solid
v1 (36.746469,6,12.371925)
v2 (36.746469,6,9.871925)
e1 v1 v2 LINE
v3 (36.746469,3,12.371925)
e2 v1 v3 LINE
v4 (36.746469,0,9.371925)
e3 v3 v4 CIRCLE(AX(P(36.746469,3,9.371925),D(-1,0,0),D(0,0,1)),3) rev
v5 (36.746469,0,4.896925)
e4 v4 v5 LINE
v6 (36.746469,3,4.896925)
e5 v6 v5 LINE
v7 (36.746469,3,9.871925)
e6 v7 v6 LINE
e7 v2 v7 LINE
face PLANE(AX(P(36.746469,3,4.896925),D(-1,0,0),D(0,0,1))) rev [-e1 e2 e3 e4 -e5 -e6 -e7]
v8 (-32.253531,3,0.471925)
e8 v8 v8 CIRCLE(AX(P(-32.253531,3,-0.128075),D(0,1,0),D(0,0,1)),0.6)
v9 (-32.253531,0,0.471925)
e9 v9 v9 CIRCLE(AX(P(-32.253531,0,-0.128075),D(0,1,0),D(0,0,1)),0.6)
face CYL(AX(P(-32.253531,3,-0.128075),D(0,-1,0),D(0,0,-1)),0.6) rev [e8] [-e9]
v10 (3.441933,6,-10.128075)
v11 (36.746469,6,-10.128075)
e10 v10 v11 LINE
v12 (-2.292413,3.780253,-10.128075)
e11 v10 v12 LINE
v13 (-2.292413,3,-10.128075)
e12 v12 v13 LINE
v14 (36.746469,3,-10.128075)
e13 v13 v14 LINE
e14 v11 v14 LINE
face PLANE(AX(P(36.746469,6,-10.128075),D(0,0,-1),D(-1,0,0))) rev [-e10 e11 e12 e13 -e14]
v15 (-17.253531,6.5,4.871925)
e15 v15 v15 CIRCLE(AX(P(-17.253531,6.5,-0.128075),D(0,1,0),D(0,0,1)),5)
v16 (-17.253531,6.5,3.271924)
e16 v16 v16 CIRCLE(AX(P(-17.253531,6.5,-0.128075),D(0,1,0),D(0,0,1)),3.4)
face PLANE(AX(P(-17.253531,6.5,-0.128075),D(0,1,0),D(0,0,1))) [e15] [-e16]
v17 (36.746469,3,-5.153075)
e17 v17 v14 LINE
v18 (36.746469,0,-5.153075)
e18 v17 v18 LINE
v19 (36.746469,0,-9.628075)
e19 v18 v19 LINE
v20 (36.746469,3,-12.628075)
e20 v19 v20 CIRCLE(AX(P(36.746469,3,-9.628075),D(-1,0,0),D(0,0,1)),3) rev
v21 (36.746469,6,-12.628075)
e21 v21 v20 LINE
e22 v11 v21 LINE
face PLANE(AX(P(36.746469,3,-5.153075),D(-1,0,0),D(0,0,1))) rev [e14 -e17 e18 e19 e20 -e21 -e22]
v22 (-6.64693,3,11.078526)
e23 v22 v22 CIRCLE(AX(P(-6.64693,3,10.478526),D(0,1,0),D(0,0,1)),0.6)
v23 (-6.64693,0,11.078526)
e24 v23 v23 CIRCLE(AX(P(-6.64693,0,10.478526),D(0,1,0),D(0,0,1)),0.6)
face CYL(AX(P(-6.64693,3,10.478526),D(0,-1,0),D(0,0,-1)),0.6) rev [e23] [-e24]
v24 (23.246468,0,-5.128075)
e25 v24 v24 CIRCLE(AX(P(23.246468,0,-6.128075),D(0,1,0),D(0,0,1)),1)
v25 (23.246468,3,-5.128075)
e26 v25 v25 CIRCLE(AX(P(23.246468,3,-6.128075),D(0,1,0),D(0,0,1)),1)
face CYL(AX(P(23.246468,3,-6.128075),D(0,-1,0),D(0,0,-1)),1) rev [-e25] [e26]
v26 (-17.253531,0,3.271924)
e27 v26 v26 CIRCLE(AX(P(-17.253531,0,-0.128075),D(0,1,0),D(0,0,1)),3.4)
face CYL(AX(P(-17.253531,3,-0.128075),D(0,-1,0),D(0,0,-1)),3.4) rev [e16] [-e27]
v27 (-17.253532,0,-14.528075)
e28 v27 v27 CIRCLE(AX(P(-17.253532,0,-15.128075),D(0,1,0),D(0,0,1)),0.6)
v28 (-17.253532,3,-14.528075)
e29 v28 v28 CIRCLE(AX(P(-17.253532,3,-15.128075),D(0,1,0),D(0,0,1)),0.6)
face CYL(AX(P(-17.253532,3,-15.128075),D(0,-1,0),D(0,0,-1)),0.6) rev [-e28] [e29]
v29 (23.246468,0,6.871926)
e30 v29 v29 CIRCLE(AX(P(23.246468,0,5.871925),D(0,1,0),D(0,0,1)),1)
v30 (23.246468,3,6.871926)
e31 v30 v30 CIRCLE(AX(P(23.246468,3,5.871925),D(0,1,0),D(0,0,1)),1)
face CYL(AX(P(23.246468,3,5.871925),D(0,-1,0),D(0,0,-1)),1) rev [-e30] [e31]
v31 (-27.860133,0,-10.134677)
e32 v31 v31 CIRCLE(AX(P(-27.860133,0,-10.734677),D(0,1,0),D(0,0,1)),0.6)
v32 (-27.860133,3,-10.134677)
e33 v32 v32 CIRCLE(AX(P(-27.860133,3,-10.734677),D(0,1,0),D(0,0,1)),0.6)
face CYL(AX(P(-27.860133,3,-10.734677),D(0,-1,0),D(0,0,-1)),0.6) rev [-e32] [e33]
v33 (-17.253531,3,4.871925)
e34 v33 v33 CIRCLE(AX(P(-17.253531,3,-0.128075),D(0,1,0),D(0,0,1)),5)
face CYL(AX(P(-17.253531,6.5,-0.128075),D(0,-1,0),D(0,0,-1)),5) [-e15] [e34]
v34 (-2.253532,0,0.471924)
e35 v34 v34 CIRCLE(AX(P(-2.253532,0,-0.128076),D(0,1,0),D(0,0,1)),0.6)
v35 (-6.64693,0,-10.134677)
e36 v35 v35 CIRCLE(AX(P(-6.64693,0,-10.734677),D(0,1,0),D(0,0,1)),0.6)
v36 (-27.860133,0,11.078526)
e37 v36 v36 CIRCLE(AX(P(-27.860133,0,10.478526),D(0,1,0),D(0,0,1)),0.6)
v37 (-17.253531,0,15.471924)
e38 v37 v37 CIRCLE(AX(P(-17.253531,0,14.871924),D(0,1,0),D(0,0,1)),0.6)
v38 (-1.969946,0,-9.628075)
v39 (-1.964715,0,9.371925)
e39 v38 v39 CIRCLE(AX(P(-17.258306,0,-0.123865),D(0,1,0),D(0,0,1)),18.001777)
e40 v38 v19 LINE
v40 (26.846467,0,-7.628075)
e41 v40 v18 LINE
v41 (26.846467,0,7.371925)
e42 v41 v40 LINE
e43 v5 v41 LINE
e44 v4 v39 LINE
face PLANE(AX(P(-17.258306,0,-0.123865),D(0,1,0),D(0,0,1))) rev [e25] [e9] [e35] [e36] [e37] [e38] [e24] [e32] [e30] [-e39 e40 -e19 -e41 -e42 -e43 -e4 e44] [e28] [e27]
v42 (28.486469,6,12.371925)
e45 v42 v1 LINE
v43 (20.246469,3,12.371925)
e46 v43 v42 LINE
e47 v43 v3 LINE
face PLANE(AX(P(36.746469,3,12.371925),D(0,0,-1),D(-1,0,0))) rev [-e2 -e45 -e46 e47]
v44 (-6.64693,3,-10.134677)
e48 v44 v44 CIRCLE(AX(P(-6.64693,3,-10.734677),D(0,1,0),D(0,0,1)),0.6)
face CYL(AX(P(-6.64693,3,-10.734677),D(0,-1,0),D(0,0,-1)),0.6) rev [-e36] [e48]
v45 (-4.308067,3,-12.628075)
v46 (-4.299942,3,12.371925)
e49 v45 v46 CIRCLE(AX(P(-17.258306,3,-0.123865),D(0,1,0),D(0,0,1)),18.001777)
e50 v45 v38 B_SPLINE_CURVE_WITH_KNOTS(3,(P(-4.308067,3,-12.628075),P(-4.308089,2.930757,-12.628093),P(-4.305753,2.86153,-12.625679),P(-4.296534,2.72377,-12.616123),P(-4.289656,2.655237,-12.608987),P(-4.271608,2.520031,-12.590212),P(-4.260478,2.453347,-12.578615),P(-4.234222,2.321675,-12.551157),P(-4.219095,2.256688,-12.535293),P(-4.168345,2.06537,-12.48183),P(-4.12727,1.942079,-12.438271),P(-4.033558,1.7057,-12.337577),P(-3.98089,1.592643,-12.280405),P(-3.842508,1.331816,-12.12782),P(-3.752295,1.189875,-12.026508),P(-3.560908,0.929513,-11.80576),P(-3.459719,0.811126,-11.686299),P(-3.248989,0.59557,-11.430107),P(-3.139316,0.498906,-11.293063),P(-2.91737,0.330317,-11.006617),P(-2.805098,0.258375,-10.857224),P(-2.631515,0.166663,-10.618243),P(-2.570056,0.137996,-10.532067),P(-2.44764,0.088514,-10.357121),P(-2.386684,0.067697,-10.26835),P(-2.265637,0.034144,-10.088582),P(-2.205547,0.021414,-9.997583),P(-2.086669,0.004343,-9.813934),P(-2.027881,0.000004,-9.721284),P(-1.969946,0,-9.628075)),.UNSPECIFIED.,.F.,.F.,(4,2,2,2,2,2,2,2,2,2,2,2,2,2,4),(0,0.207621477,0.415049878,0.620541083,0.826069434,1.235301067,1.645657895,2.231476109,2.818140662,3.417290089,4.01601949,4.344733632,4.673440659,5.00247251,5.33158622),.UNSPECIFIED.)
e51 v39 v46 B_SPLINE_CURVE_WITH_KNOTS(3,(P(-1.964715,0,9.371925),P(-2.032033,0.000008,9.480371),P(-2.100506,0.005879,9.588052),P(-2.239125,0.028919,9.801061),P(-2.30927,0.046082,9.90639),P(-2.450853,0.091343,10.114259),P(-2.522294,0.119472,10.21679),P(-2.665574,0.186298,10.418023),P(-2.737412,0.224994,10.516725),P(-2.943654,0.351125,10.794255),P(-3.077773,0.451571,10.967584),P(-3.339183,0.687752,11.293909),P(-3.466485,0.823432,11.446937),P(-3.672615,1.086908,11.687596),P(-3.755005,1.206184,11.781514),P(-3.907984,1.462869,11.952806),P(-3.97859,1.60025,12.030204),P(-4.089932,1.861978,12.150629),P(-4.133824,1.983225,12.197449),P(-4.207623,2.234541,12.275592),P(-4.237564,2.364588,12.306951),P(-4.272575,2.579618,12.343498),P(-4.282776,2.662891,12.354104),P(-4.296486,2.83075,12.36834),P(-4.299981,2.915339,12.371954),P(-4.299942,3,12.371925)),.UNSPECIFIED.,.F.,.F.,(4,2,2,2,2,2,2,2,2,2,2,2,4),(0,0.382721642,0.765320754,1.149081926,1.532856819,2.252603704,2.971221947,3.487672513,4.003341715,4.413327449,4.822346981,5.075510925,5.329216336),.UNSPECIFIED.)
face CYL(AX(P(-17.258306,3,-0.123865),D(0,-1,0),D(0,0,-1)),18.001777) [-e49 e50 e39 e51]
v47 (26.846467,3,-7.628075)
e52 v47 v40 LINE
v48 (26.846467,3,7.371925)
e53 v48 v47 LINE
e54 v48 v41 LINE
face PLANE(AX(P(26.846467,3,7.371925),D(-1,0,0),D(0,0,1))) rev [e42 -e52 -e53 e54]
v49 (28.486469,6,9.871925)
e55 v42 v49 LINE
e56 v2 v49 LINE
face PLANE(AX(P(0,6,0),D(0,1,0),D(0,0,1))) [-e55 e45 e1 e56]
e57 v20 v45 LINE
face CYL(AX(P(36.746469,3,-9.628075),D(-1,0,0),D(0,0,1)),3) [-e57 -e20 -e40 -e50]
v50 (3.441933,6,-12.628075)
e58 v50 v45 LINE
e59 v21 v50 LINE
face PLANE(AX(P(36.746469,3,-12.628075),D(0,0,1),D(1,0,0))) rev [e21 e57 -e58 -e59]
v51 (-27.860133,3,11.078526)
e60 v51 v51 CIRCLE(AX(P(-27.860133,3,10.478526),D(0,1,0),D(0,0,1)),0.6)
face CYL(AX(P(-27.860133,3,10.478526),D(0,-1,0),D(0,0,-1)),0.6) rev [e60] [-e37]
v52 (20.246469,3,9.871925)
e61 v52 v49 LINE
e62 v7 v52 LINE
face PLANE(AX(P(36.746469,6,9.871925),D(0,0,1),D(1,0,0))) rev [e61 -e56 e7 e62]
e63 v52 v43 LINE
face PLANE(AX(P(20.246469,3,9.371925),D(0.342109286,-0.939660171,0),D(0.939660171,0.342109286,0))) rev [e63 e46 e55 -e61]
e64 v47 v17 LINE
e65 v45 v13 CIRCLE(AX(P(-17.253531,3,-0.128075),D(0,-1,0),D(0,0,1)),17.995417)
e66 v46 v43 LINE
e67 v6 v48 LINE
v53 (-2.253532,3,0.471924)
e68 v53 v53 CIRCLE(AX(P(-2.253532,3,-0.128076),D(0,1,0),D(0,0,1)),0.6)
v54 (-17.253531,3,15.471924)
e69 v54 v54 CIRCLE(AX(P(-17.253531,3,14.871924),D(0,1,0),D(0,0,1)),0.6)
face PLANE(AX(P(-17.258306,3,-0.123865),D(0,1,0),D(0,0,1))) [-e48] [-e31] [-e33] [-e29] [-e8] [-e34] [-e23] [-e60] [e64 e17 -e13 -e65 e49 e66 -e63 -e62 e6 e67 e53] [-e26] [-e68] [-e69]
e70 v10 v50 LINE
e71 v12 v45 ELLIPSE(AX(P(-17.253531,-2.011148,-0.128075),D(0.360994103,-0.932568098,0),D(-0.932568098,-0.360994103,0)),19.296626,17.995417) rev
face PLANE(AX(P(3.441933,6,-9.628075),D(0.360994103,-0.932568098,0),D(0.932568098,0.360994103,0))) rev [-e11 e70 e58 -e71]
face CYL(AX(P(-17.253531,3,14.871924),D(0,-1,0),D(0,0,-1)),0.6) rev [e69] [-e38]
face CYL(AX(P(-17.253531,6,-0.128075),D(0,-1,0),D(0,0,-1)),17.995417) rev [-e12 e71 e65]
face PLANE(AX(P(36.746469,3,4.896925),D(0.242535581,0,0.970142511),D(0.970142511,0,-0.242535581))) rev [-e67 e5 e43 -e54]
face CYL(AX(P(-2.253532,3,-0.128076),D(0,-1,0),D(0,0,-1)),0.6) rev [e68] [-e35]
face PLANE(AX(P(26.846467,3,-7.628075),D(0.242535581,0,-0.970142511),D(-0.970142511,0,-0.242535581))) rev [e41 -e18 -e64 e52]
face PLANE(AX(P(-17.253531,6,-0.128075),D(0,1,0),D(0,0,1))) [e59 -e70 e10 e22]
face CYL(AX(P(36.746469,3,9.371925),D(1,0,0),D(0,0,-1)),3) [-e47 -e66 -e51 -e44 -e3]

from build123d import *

# Parameters (mm, degrees)
CROQUIS1_R              = 3.399999868
CROQUIS1_R_2            = 0.599999638
CROQUIS1_R_3            = 0.999999893
CROQUIS1_R_4            = 1.000000486
SALIENTE_EXTRUIR1_DEPTH = 3
CROQUIS2_W              = 16.5
CROQUIS2_H              = 2.5
SALIENTE_EXTRUIR2_DEPTH = 3
CORTAR_EXTRUIR1_DEPTH   = 3
CORTAR_EXTRUIR2_DEPTH   = 3
CROQUIS5_R              = 5
CROQUIS5_R_2            = 3.399999868
SALIENTE_EXTRUIR3_DEPTH = 3.5
REDONDEO1_R             = 3


with BuildPart() as part:
    # Croquis1 → Saliente-Extruir1 (new body)
    with BuildSketch(Plane(origin=(0, 0, 0), x_dir=(1, 0, 0), z_dir=(0, 1, 0))):
        with BuildLine():
            Line((36.746468572, 5.153075413), (36.746468572, 12.628075318))
            Line((36.746468572, 12.628075318), (-4.308066759, 12.628075318))
            ThreePointArc((-4.308066759, 12.628075318), (-35.260081681, 0.11801537), (-4.299942386, -12.371924682))
            Line((-4.299942386, -12.371924682), (36.746468572, -12.371924682))
            Line((36.746468572, -12.371924682), (36.746468572, -4.896924777))
            Line((36.746468572, -4.896924777), (26.846467047, -7.371924682))
            Line((26.846467047, -7.371924682), (26.846467047, 7.628075318))
            Line((26.846467047, 7.628075318), (36.746468572, 5.153075413))
        make_face()
        with Locations(Location((-17.253531302, 0.128075481, 0), (0, 0, 270))):
            Circle(CROQUIS1_R, mode=Mode.SUBTRACT)
        with Locations(Location((-17.253531676, 15.128075105, 0), (0, 0, 270))):
            Circle(CROQUIS1_R_2, mode=Mode.SUBTRACT)
        with Locations(Location((23.24646788, 6.128075095, 0), (0, 0, 270))):
            Circle(CROQUIS1_R_3, mode=Mode.SUBTRACT)
        with Locations(Location((23.246467992, -5.871925124, 0), (0, 0, 270))):
            Circle(CROQUIS1_R_4, mode=Mode.SUBTRACT)
        with Locations(Location((-6.646930036, 10.734677061, 0), (0, 0, 270))):
            Circle(CROQUIS1_R_2, mode=Mode.SUBTRACT)
        with Locations(Location((-2.25353164, 0.128075566, 0), (0, 0, 270))):
            Circle(CROQUIS1_R_2, mode=Mode.SUBTRACT)
        with Locations(Location((-6.646929684, -10.478526074, 0), (0, 0, 270))):
            Circle(CROQUIS1_R_2, mode=Mode.SUBTRACT)
        with Locations(Location((-17.253531179, -14.871924469, 0), (0, 0, 270))):
            Circle(CROQUIS1_R_2, mode=Mode.SUBTRACT)
        with Locations(Location((-27.860132819, -10.478526425, 0), (0, 0, 270))):
            Circle(CROQUIS1_R_2, mode=Mode.SUBTRACT)
        with Locations(Location((-32.253531215, 0.12807507, 0), (0, 0, 270))):
            Circle(CROQUIS1_R_2, mode=Mode.SUBTRACT)
        with Locations(Location((-27.860133171, 10.73467671, 0), (0, 0, 270))):
            Circle(CROQUIS1_R_2, mode=Mode.SUBTRACT)
    extrude(amount=SALIENTE_EXTRUIR1_DEPTH)

    # Croquis2 → Saliente-Extruir2 (add)
    with BuildSketch(Plane(origin=(0, 3, 0), x_dir=(1, 0, 0), z_dir=(0, 1, 0))):
        with BuildLine():
            Line((36.746468572, 12.628075318), (-4.308066759, 12.628075318))
            ThreePointArc((-4.308066759, 12.628075318), (-3.24436155, 11.423127984), (-2.292413315, 10.128075318))
            Line((-2.292413315, 10.128075318), (36.746468572, 10.128075318))
            Line((36.746468572, 10.128075318), (36.746468572, 12.628075318))
        make_face()
        with Locations((28.496468572, -11.121924682)):
            Rectangle(CROQUIS2_W, CROQUIS2_H)
    extrude(amount=SALIENTE_EXTRUIR2_DEPTH)

    # Croquis3 → Cortar-Extruir1 (cut)
    with BuildSketch(Plane.XY.offset(12.371924682)):
        Polygon((20.246468572, 3), (28.486468572, 6), (20.246468572, 6), align=None)
    extrude(amount=-CORTAR_EXTRUIR1_DEPTH, mode=Mode.SUBTRACT)

    # Croquis4 → Cortar-Extruir2 (cut)
    with BuildSketch(Plane(origin=(0, 0, -12.628075318), x_dir=(-1, 0, 0), z_dir=(0, 0, -1))):
        Polygon((4.308066759, 3), (4.308066759, 6), (-3.441933241, 6), align=None)
    extrude(amount=-CORTAR_EXTRUIR2_DEPTH, mode=Mode.SUBTRACT)

    # Croquis5 → Saliente-Extruir3 (add)
    with BuildSketch(Plane(origin=(0, 3, 0), x_dir=(1, 0, 0), z_dir=(0, 1, 0))):
        with Locations(Location((-17.253531302, 0.128075481, 0), (0, 0, 270))):
            Circle(CROQUIS5_R)
        with Locations(Location((-17.253531302, 0.128075481, 0), (0, 0, 270))):
            Circle(CROQUIS5_R_2, mode=Mode.SUBTRACT)
    extrude(amount=SALIENTE_EXTRUIR3_DEPTH)

    # Redondeo1
    redondeo1_edges = [part.edges().sort_by_distance(p)[0] for p in [
        (16.219200907, 0, -12.628075318),
        (16.223263093, 0, 12.371924682),
    ]]
    fillet(redondeo1_edges, radius=REDONDEO1_R - 0.0001)  # a hair under: the kernel refuses the full size


solid = part.part
